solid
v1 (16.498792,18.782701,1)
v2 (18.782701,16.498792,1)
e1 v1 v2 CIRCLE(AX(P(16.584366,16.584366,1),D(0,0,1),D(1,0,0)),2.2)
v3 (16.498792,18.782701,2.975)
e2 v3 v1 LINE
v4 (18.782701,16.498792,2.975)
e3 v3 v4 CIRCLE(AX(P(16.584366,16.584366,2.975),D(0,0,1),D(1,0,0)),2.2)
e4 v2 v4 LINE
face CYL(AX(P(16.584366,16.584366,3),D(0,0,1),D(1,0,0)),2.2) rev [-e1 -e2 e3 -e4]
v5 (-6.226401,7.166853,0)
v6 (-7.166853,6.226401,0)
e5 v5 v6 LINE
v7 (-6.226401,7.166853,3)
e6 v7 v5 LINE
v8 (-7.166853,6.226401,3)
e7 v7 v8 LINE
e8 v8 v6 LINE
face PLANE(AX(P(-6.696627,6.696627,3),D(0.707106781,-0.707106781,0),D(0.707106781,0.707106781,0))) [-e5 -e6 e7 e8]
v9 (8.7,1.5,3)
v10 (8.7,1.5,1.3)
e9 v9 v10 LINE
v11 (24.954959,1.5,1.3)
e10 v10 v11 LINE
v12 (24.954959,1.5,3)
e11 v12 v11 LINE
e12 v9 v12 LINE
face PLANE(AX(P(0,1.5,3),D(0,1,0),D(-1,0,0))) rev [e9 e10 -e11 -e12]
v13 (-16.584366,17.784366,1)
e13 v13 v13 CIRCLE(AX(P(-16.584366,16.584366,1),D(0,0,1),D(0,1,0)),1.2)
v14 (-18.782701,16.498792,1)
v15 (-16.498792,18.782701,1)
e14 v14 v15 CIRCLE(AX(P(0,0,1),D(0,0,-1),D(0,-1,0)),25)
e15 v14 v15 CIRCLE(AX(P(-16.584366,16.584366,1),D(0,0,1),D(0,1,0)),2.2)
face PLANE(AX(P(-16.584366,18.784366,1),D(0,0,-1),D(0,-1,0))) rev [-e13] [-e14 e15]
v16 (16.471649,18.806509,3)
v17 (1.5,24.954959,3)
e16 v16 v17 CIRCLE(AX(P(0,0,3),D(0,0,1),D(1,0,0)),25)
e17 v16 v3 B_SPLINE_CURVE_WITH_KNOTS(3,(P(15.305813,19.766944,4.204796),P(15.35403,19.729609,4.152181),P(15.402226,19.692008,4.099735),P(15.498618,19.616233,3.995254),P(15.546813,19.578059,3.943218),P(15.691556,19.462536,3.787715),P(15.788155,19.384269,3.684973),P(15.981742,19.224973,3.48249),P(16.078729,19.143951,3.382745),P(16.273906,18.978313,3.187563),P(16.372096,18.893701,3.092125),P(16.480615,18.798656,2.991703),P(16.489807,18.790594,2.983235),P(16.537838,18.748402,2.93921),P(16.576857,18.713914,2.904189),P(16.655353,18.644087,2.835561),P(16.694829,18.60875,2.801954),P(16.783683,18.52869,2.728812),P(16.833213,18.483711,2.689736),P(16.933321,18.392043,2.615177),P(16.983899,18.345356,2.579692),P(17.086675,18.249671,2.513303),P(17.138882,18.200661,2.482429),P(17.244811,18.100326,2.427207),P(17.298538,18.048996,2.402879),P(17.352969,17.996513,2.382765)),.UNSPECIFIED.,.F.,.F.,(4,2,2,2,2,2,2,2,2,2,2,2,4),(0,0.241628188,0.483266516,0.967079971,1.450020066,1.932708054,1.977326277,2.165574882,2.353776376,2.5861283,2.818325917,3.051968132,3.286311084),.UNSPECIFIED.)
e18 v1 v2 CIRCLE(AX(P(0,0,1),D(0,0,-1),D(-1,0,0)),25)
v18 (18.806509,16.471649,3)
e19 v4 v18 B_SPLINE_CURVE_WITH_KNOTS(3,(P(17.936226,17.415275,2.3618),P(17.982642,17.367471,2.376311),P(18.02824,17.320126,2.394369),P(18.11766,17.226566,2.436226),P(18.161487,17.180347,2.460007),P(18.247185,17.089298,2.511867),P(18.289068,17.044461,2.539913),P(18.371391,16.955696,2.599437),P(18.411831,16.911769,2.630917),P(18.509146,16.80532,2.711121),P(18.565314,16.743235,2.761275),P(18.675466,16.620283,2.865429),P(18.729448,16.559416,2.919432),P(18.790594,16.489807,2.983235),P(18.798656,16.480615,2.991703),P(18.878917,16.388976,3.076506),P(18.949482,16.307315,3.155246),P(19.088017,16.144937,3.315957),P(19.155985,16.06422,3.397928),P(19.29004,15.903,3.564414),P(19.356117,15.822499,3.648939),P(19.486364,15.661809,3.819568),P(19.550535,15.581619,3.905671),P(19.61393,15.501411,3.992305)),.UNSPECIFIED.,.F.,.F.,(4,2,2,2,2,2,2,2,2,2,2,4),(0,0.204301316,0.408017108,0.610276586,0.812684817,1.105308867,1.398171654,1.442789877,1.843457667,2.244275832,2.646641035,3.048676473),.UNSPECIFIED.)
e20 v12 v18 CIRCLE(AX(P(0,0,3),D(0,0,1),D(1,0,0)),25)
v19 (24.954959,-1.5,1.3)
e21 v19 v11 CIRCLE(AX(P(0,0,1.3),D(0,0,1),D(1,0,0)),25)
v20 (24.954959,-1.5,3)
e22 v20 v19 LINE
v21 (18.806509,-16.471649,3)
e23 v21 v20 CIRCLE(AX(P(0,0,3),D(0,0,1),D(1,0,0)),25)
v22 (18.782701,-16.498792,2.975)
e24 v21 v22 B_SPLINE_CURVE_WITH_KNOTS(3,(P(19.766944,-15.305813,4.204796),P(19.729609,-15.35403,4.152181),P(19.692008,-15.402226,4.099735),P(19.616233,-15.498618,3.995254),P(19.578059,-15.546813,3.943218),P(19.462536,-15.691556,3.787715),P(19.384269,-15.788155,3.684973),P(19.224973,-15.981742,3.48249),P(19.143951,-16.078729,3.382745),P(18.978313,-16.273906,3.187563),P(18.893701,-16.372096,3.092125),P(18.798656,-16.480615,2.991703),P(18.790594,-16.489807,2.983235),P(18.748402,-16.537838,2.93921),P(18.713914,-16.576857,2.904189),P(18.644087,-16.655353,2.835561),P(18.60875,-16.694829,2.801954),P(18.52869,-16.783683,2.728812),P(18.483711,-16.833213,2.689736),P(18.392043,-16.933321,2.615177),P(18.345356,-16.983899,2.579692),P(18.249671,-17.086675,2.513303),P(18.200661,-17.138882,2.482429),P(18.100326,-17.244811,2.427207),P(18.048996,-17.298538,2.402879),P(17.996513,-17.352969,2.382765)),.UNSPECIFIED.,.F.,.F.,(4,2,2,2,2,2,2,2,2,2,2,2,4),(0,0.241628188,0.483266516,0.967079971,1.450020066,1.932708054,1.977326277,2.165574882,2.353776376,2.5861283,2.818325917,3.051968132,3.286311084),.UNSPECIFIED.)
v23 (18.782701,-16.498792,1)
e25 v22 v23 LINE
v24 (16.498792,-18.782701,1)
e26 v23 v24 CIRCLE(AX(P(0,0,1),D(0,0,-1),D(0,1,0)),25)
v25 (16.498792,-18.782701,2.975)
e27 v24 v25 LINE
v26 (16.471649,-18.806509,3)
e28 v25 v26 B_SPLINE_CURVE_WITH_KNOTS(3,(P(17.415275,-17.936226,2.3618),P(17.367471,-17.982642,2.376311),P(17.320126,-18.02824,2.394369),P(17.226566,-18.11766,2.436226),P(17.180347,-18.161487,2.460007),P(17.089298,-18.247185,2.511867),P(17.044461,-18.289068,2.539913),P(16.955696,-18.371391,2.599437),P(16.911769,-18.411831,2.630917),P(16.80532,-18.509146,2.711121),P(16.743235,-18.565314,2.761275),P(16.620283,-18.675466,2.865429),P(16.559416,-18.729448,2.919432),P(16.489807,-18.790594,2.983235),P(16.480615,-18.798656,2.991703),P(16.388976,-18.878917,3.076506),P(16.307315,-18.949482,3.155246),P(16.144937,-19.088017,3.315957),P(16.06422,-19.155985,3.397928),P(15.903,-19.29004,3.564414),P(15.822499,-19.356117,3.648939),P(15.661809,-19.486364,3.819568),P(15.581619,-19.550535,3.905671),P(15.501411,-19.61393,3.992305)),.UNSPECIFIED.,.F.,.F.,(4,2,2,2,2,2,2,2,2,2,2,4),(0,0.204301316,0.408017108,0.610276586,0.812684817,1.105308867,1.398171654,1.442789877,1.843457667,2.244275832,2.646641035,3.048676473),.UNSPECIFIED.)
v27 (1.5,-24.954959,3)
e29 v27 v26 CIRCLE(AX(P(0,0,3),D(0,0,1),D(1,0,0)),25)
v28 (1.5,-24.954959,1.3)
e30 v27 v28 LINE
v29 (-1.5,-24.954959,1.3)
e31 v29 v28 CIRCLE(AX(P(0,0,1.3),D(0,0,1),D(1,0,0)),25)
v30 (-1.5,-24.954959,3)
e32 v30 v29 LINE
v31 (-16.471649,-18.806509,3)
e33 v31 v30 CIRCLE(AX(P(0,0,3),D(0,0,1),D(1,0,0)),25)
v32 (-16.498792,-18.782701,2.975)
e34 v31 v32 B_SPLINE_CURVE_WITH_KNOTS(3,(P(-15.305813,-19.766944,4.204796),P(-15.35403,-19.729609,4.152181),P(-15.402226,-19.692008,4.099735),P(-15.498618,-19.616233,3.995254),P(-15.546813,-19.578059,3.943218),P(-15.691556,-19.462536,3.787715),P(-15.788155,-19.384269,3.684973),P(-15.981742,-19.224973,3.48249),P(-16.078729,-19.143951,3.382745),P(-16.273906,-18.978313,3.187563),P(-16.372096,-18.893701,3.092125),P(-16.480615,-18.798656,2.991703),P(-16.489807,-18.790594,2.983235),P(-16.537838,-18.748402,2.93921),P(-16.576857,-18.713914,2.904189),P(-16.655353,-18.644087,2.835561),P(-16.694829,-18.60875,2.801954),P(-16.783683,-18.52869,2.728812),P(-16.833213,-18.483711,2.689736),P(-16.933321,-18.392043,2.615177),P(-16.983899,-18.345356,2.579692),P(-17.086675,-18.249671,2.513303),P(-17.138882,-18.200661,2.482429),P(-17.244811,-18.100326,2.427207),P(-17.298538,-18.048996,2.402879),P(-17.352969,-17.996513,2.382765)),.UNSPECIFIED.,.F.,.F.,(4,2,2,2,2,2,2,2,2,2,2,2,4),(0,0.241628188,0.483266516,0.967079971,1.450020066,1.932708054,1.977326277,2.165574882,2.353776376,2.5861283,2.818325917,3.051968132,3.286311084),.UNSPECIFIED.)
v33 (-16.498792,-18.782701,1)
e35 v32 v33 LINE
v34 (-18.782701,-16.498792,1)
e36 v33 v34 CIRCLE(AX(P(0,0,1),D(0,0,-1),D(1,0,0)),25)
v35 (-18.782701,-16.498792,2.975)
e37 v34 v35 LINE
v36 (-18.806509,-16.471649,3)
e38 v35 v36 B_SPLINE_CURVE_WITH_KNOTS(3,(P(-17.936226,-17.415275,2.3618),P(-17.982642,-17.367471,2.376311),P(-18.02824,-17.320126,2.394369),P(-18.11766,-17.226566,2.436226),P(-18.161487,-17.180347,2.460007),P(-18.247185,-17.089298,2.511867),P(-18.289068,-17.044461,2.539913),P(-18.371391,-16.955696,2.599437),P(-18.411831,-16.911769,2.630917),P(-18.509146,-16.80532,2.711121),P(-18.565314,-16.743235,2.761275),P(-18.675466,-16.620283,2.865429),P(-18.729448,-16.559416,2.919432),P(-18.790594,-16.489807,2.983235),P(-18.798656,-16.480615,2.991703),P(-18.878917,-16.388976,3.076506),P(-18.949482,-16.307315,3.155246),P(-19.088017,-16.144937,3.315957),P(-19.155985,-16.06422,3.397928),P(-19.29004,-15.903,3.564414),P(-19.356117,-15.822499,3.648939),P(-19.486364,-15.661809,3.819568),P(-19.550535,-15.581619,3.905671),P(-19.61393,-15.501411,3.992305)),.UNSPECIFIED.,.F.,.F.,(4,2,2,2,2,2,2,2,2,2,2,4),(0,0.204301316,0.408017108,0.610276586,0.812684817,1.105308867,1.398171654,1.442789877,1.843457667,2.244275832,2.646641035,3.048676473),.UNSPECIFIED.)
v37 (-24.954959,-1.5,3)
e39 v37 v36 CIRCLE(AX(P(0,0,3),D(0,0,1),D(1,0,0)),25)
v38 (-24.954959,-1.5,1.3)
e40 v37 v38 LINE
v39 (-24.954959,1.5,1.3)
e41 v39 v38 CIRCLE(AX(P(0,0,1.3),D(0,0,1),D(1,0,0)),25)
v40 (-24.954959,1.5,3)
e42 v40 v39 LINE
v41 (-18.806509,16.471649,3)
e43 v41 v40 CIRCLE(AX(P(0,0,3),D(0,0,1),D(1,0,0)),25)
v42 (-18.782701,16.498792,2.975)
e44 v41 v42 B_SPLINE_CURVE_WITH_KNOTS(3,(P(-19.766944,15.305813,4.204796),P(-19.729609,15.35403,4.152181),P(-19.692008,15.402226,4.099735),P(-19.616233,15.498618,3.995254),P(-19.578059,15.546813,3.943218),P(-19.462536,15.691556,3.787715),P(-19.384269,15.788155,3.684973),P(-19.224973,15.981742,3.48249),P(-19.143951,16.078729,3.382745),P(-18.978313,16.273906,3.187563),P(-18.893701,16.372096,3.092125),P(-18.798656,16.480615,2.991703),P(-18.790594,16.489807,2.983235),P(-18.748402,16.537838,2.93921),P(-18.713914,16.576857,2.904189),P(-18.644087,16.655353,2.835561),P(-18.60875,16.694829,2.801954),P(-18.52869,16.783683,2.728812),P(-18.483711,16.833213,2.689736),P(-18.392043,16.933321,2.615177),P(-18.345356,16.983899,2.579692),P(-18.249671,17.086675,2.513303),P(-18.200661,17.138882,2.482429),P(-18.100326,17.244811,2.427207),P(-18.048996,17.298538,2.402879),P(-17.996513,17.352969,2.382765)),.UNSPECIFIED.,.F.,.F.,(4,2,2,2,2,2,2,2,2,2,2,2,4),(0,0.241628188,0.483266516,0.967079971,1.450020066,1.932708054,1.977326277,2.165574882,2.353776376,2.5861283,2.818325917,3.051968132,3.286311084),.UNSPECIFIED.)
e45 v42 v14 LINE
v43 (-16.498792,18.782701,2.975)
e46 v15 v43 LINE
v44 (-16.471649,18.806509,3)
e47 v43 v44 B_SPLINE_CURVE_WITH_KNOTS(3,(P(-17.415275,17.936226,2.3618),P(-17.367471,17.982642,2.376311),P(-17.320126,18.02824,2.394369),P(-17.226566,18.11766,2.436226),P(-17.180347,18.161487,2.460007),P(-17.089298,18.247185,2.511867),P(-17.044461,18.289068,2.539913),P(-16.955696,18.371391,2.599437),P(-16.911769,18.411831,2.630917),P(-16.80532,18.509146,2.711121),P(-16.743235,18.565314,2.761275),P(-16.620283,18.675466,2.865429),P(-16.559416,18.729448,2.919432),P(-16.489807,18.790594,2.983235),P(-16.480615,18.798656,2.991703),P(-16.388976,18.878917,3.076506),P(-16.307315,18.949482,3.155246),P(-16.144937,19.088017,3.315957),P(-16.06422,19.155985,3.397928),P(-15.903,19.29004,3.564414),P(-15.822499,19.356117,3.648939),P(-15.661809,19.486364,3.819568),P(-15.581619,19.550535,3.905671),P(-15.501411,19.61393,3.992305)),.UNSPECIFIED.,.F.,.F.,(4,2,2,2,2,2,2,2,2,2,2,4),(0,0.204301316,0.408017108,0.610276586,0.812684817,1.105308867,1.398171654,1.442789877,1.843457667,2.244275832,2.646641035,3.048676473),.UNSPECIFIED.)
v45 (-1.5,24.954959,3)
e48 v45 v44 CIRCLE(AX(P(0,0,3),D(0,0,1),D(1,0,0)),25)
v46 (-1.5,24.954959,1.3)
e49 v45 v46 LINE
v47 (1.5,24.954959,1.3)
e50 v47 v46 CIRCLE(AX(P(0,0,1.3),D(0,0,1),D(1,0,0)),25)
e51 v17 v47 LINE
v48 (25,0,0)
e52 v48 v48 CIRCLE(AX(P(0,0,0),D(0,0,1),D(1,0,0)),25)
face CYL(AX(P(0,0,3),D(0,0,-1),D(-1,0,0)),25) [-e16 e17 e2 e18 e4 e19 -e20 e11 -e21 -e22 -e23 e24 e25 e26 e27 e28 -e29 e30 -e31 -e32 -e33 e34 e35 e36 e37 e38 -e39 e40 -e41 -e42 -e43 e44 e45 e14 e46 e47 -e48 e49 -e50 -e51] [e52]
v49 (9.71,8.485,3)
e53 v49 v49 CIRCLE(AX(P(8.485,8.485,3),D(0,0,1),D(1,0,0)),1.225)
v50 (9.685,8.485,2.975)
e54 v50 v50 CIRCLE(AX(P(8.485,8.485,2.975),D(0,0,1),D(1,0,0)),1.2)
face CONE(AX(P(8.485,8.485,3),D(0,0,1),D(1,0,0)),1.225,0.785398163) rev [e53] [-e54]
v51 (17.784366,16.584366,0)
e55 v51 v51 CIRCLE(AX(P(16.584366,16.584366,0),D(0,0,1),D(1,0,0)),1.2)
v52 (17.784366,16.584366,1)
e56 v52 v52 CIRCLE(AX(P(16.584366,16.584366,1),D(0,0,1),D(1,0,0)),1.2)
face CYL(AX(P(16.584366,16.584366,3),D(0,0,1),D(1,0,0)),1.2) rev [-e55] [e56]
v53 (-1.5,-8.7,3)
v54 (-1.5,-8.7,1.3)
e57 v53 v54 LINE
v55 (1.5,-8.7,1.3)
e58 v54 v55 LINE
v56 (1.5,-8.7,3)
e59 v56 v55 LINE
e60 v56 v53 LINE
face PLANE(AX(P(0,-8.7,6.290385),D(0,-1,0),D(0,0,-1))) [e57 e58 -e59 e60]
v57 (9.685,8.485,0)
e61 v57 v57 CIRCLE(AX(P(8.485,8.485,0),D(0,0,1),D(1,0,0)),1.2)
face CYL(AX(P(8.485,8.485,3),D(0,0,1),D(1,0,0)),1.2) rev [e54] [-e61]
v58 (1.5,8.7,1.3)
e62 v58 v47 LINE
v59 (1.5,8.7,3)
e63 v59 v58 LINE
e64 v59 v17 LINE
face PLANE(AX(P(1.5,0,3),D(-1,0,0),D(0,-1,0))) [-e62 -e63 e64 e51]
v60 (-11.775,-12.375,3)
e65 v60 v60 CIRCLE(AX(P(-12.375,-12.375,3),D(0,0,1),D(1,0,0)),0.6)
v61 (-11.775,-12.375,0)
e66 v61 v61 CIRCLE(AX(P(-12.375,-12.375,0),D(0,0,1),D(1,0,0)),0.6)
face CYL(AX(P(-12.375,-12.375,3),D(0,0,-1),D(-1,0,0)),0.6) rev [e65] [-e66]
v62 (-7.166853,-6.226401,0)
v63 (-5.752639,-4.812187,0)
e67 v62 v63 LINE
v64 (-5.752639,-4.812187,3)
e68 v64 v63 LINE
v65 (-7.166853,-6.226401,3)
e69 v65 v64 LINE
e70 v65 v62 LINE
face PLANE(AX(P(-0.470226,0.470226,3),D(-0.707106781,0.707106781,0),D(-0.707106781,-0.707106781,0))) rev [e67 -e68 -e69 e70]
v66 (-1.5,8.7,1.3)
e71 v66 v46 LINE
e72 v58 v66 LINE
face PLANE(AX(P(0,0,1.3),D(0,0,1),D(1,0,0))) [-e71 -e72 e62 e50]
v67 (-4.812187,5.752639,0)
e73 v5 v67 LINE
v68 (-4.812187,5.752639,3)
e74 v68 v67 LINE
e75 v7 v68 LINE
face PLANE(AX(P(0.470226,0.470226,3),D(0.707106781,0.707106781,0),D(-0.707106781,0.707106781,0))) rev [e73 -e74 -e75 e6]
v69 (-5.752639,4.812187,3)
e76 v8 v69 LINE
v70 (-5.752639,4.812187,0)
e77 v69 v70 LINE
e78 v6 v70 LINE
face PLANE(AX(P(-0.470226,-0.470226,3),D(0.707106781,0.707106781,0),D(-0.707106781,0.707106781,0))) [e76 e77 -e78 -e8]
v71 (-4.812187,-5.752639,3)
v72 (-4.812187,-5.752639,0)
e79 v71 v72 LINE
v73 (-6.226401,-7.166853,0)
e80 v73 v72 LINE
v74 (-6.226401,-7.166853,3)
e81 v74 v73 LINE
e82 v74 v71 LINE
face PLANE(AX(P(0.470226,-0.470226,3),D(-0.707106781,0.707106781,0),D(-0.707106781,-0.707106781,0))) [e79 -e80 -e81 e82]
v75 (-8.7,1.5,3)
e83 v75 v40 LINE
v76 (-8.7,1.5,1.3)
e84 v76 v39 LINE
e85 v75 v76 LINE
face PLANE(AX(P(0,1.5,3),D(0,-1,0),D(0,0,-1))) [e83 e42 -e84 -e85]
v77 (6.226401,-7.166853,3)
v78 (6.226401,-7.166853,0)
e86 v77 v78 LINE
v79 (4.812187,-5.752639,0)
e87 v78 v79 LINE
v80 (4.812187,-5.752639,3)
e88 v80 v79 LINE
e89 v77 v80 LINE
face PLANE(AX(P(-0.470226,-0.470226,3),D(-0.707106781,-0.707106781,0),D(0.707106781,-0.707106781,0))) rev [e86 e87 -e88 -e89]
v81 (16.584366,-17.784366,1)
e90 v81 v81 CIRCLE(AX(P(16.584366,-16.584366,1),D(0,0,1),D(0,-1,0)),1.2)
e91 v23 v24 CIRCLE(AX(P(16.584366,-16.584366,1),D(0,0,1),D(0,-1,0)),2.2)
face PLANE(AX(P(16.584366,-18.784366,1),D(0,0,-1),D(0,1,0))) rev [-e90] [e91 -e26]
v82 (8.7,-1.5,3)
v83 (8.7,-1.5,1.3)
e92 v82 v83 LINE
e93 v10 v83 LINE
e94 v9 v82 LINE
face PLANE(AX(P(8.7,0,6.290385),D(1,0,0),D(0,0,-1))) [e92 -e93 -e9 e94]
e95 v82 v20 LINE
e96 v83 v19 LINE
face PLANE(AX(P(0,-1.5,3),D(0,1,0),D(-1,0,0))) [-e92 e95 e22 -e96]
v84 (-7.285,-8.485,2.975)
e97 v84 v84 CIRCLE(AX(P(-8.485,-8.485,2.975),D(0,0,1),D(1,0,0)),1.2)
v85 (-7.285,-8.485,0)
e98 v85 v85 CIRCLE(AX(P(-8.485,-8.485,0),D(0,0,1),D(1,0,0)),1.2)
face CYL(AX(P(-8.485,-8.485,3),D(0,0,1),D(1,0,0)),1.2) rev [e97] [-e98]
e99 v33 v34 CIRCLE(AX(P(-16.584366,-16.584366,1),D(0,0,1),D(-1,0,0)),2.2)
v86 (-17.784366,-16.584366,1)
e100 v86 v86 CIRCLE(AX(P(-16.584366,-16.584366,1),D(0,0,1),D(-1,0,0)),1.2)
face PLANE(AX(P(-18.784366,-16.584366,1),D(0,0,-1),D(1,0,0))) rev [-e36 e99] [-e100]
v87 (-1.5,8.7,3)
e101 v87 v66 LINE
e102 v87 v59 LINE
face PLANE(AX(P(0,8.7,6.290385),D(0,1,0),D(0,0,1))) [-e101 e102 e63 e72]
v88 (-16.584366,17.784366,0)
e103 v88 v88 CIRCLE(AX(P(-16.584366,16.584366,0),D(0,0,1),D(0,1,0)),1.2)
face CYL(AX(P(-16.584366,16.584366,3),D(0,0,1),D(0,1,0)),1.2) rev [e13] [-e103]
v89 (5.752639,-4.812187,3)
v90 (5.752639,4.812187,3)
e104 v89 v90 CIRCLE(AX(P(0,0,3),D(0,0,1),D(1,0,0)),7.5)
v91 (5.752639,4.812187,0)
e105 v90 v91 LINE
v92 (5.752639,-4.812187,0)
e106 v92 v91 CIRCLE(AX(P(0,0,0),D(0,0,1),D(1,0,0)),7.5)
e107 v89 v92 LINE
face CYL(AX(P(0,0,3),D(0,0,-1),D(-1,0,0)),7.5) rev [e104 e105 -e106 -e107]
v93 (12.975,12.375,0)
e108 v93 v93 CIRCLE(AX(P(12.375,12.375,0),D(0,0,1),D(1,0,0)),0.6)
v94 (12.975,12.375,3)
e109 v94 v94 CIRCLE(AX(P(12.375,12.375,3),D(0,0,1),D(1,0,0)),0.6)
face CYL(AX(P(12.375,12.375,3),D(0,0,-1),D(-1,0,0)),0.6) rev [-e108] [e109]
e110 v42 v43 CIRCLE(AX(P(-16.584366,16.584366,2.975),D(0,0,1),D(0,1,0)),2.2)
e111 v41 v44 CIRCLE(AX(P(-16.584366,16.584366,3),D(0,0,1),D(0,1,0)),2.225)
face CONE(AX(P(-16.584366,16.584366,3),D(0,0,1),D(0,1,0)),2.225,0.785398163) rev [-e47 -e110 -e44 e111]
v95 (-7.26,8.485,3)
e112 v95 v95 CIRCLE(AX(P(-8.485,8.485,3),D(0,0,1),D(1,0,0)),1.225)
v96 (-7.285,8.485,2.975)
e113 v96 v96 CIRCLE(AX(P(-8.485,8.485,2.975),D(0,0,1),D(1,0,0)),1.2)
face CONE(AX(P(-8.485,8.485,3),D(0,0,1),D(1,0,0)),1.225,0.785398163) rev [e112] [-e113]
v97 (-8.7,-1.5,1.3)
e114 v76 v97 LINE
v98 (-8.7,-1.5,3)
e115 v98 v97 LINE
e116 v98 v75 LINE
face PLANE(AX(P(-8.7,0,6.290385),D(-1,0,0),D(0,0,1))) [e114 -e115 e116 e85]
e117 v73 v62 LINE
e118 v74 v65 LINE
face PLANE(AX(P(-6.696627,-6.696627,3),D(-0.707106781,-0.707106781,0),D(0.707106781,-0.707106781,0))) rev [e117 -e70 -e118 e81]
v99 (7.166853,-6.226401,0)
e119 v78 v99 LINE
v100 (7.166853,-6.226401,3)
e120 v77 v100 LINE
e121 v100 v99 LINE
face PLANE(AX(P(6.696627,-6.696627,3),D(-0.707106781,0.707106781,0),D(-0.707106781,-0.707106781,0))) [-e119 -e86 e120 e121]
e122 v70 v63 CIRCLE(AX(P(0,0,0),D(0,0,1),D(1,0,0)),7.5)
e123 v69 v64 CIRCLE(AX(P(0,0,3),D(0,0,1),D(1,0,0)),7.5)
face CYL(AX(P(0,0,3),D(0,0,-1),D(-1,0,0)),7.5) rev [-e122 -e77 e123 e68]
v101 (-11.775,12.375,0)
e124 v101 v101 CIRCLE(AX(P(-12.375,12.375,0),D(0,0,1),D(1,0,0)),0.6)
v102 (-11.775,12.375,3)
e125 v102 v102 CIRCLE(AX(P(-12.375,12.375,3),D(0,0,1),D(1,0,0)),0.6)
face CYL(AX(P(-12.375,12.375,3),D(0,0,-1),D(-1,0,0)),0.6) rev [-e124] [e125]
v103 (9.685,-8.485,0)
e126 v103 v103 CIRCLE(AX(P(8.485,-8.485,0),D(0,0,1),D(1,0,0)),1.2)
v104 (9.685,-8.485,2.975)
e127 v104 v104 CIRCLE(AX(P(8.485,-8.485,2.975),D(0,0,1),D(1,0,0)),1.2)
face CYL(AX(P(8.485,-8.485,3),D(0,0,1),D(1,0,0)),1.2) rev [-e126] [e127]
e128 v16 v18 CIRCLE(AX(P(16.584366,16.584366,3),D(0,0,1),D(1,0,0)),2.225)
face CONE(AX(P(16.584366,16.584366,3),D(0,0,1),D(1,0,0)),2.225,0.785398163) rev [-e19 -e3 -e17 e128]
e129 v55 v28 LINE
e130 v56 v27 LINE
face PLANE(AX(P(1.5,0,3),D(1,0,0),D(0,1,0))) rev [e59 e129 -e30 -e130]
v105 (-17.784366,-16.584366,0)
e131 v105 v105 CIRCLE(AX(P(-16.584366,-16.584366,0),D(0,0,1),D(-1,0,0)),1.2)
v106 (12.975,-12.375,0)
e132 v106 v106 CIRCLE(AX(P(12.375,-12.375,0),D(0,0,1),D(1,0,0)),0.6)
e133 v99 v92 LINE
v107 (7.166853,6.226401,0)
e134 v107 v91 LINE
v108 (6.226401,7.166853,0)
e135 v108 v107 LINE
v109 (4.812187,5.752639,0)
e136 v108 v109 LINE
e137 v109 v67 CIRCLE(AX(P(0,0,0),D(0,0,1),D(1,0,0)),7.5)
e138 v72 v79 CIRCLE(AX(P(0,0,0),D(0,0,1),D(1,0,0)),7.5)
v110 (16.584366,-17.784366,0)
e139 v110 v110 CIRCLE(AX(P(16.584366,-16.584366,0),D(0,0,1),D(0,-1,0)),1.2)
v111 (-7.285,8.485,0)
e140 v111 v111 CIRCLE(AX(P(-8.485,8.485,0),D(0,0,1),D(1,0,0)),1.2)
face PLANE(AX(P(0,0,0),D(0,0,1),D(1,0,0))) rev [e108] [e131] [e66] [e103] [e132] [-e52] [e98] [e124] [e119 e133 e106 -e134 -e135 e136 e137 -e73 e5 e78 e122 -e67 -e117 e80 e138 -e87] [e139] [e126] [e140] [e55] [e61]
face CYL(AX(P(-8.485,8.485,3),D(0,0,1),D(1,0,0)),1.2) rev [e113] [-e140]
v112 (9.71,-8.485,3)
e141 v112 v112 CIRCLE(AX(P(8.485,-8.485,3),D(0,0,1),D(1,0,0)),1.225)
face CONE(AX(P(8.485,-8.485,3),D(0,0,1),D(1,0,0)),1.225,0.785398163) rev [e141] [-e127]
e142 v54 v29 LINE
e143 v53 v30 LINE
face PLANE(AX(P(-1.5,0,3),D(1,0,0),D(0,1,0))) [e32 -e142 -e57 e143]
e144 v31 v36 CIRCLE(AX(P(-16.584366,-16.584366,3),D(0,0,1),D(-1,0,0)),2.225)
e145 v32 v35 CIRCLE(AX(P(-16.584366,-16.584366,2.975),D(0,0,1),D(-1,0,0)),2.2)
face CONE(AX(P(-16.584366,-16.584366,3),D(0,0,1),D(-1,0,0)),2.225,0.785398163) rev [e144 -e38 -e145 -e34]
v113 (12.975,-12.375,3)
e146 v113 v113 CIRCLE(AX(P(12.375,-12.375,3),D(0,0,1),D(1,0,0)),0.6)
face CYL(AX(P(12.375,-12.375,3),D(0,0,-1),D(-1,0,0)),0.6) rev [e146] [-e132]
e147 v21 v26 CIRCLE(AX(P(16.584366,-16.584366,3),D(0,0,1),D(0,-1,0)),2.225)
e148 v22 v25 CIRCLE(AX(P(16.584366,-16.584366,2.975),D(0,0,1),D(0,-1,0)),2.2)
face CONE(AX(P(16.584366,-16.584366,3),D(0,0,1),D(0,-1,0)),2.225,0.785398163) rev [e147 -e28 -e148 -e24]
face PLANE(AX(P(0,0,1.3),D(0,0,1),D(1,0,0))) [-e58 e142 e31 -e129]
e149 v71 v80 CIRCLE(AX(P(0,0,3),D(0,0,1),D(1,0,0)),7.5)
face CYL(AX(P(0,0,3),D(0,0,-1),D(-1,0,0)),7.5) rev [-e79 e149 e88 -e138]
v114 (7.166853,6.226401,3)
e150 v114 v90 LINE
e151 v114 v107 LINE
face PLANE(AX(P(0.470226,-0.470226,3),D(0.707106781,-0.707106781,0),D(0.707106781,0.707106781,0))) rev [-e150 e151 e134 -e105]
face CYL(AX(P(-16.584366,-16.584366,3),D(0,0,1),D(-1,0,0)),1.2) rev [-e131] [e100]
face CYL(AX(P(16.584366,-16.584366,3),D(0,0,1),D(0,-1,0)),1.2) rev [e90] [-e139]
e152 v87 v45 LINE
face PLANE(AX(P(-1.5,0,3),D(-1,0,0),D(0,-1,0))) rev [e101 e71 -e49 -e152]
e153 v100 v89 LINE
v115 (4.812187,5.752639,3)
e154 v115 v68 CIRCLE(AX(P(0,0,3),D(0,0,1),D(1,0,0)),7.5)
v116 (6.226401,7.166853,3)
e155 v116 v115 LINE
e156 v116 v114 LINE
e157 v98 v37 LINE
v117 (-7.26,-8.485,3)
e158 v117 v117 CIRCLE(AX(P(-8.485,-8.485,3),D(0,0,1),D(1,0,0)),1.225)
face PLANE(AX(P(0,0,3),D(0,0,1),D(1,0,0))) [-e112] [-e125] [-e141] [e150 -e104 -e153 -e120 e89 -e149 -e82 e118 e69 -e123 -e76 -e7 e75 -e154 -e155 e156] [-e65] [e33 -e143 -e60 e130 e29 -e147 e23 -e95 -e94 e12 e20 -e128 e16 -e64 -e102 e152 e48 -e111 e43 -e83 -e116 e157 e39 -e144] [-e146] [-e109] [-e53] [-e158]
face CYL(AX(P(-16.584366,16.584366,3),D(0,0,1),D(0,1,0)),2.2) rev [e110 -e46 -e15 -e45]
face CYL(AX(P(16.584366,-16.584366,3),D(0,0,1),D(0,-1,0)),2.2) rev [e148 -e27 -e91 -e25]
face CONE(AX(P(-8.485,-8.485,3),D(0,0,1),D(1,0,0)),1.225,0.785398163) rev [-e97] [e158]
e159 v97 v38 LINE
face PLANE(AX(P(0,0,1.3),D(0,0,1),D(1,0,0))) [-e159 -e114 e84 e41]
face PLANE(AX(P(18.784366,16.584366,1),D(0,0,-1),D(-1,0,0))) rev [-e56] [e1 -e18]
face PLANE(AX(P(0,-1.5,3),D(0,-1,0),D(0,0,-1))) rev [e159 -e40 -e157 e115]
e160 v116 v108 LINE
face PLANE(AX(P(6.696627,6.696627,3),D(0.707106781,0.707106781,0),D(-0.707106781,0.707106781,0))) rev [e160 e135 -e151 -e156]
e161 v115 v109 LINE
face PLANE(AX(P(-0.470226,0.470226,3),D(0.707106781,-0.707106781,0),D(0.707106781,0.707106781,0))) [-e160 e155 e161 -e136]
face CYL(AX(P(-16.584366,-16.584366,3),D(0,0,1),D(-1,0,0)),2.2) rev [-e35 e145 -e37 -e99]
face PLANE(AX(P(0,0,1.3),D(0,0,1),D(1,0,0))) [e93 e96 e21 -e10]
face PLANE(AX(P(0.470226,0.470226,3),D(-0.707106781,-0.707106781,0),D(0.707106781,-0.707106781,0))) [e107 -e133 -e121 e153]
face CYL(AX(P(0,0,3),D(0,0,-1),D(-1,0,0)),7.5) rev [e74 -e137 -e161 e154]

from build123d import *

# Parameters (mm, degrees)
SKETCH1_R             = 0.6
BOSS_EXTRUDE1_DEPTH   = 3
BOSS_EXTRUDE1_2_DEPTH = 3
BOSS_EXTRUDE1_3_DEPTH = 3
BOSS_EXTRUDE1_4_DEPTH = 3
BOSS_EXTRUDE2_DEPTH   = 1.3
BOSS_EXTRUDE3_DEPTH   = 3
CIRPATTERN1_COUNT     = 4


# Read off the part's stored shape, not the designer's step: M2 Clearance Hole1
with BuildPart() as part:
    # Sketch1 → Boss-Extrude1 (new body)
    with BuildSketch(Plane(origin=(0, 0, 0), x_dir=(0, 1, 0), z_dir=(0, 0, 1))):
        with BuildLine():
            Line((-1.5, 7.348469228), (-1.5, 24.954959427))
            ThreePointArc((-1.5, 24.954959427), (-17.67766953, 17.67766953), (-24.954959427, 1.5))
            Line((-24.954959427, 1.5), (-7.348469228, 1.5))
            ThreePointArc((-7.348469228, 1.5), (-6.756656365, 3.255394717), (-5.752639047, 4.812187028))
            Line((-5.752639047, 4.812187028), (-7.166852609, 6.226400591))
            Line((-7.166852609, 6.226400591), (-6.226400591, 7.166852609))
            Line((-6.226400591, 7.166852609), (-4.812187028, 5.752639047))
            ThreePointArc((-4.812187028, 5.752639047), (-3.255394717, 6.756656365), (-1.5, 7.348469228))
        make_face()
        with Locations(Location((-12.375, 12.375, 0), (0, 0, 270))):
            Circle(SKETCH1_R, mode=Mode.SUBTRACT)
    extrude(amount=BOSS_EXTRUDE1_DEPTH)

    # Sketch1<9> → Boss-Extrude2 (add)
    with BuildSketch(Plane(origin=(0, 0, 0), x_dir=(0, 1, 0), z_dir=(0, 0, 1))):
        with BuildLine():
            Line((1.5, 7.348469228), (1.5, 24.954959427))
            ThreePointArc((1.5, 24.954959427), (0, 25), (-1.5, 24.954959427))
            Line((-1.5, 24.954959427), (-1.5, 7.348469228))
            ThreePointArc((-1.5, 7.348469228), (0, 7.5), (1.5, 7.348469228))
        make_face()
        with BuildLine():
            ThreePointArc((-24.954959427, 1.5), (-25, 0), (-24.954959427, -1.5))
            Line((-24.954959427, -1.5), (-7.348469228, -1.5))
            ThreePointArc((-7.348469228, -1.5), (-7.5, 0), (-7.348469228, 1.5))
            Line((-7.348469228, 1.5), (-24.954959427, 1.5))
        make_face()
        with BuildLine():
            ThreePointArc((24.954959427, -1.5), (25, 0), (24.954959427, 1.5))
            Line((24.954959427, 1.5), (7.348469228, 1.5))
            ThreePointArc((7.348469228, 1.5), (7.5, 0), (7.348469228, -1.5))
            Line((7.348469228, -1.5), (24.954959427, -1.5))
        make_face()
        with BuildLine():
            ThreePointArc((-1.5, -24.954959427), (0, -25), (1.5, -24.954959427))
            Line((1.5, -24.954959427), (1.5, -7.348469228))
            ThreePointArc((1.5, -7.348469228), (0, -7.5), (-1.5, -7.348469228))
            Line((-1.5, -7.348469228), (-1.5, -24.954959427))
        make_face()
    extrude(amount=BOSS_EXTRUDE2_DEPTH)


with BuildPart() as body_2:
    # Sketch1 → Boss-Extrude1 2 (new body)
    with BuildSketch(Plane(origin=(0, 0, 0), x_dir=(0, 1, 0), z_dir=(0, 0, 1))):
        with BuildLine():
            Line((1.5, 24.954959427), (1.5, 7.348469228))
            ThreePointArc((1.5, 7.348469228), (3.255394717, 6.756656365), (4.812187028, 5.752639047))
            Line((4.812187028, 5.752639047), (6.226400591, 7.166852609))
            Line((6.226400591, 7.166852609), (7.166852609, 6.226400591))
            Line((7.166852609, 6.226400591), (5.752639047, 4.812187028))
            ThreePointArc((5.752639047, 4.812187028), (6.756656365, 3.255394717), (7.348469228, 1.5))
            Line((7.348469228, 1.5), (24.954959427, 1.5))
            ThreePointArc((24.954959427, 1.5), (17.67766953, 17.67766953), (1.5, 24.954959427))
        make_face()
        with Locations(Location((12.375, 12.375, 0), (0, 0, 270))):
            Circle(SKETCH1_R, mode=Mode.SUBTRACT)
    extrude(amount=BOSS_EXTRUDE1_2_DEPTH)

    # M2 Clearance Hole1 4 outline → M2 Clearance Hole1 4 (revolve, cut)
    with BuildSketch(Plane(origin=(-8.485, 8.485, 0), x_dir=(1, 0, 0), z_dir=(0, -1, 0))):
        Polygon((0, 0), (1.2, 0), (1.2, 2.975), (1.225, 3), (0, 3), align=None)
    revolve(axis=Axis((-8.485, 8.485, 0), (0, 0, 1)), mode=Mode.SUBTRACT)



with BuildPart() as body_3:
    # Sketch1 → Boss-Extrude1 3 (new body)
    with BuildSketch(Plane(origin=(0, 0, 0), x_dir=(0, 1, 0), z_dir=(0, 0, 1))):
        with BuildLine():
            Line((-7.348469228, -1.5), (-24.954959427, -1.5))
            ThreePointArc((-24.954959427, -1.5), (-17.67766953, -17.67766953), (-1.5, -24.954959427))
            Line((-1.5, -24.954959427), (-1.5, -7.348469228))
            ThreePointArc((-1.5, -7.348469228), (-3.255394717, -6.756656365), (-4.812187028, -5.752639047))
            Line((-4.812187028, -5.752639047), (-6.226400591, -7.166852609))
            Line((-6.226400591, -7.166852609), (-7.166852609, -6.226400591))
            Line((-7.166852609, -6.226400591), (-5.752639047, -4.812187028))
            ThreePointArc((-5.752639047, -4.812187028), (-6.756656365, -3.255394717), (-7.348469228, -1.5))
        make_face()
        with Locations(Location((-12.375, -12.375, 0), (0, 0, 270))):
            Circle(SKETCH1_R, mode=Mode.SUBTRACT)
    extrude(amount=BOSS_EXTRUDE1_3_DEPTH)

    # M2 Clearance Hole1 2 outline → M2 Clearance Hole1 2 (revolve, cut)
    with BuildSketch(Plane(origin=(8.485, -8.485, 0), x_dir=(1, 0, 0), z_dir=(0, -1, 0))):
        Polygon((0, 0), (1.2, 0), (1.2, 2.975), (1.225, 3), (0, 3), align=None)
    revolve(axis=Axis((8.485, -8.485, 0), (0, 0, 1)), mode=Mode.SUBTRACT)


with BuildPart() as body_4:
    # Sketch1 → Boss-Extrude1 4 (new body)
    with BuildSketch(Plane(origin=(0, 0, 0), x_dir=(0, 1, 0), z_dir=(0, 0, 1))):
        with BuildLine():
            Line((24.954959427, -1.5), (7.348469228, -1.5))
            ThreePointArc((7.348469228, -1.5), (6.756656365, -3.255394717), (5.752639047, -4.812187028))
            Line((5.752639047, -4.812187028), (7.166852609, -6.226400591))
            Line((7.166852609, -6.226400591), (6.226400591, -7.166852609))
            Line((6.226400591, -7.166852609), (4.812187028, -5.752639047))
            ThreePointArc((4.812187028, -5.752639047), (3.255394717, -6.756656365), (1.5, -7.348469228))
            Line((1.5, -7.348469228), (1.5, -24.954959427))
            ThreePointArc((1.5, -24.954959427), (17.67766953, -17.67766953), (24.954959427, -1.5))
        make_face()
        with Locations(Location((12.375, -12.375, 0), (0, 0, 270))):
            Circle(SKETCH1_R, mode=Mode.SUBTRACT)
    extrude(amount=BOSS_EXTRUDE1_4_DEPTH)

    # M2 Clearance Hole1 outline → M2 Clearance Hole1 (revolve, cut)
    with BuildSketch(Plane(origin=(8.485, 8.485, 0), x_dir=(1, 0, 0), z_dir=(0, -1, 0))):
        Polygon((0, 0), (1.2, 0), (1.2, 2.975), (1.225, 3), (0, 3), align=None)
    revolve(axis=Axis((8.485, 8.485, 0), (0, 0, 1)), mode=Mode.SUBTRACT)


with BuildPart() as boss_extrude2_piece_1:
    # of the separate pieces the step leaves, piece 1, a body of its own (boss_extrude2_pieces)
    add(part.part.solids().sort_by_distance((-24.954959427, -1.5, 1.3))[0])

    # M2 Clearance Hole1 3 outline → M2 Clearance Hole1 3 (revolve, cut)
    with BuildSketch(Plane(origin=(-8.485, -8.485, 0), x_dir=(1, 0, 0), z_dir=(0, -1, 0))):
        Polygon((0, 0), (1.2, 0), (1.2, 2.975), (1.225, 3), (0, 3), align=None)
    revolve(axis=Axis((-8.485, -8.485, 0), (0, 0, 1)), mode=Mode.SUBTRACT)


with BuildPart() as boss_extrude2_piece_2:
    # of the separate pieces the step leaves, piece 2, a body of its own (boss_extrude2_pieces)
    add(part.part.solids().sort_by_distance((-1.5, 7.348469228, 0))[0])


with BuildPart() as boss_extrude2_piece_3:
    # of the separate pieces the step leaves, piece 3, a body of its own (boss_extrude2_pieces)
    add(part.part.solids().sort_by_distance((24.954959427, -1.5, 0))[0])


with BuildPart() as body_2_1:
    add(body_2.part)

    add(body_3.part)  # Boss-Extrude3 merges body 3

    add(body_4.part)  # Boss-Extrude3 merges body 4

    add(boss_extrude2_piece_1.part)  # Boss-Extrude3 merges Boss-Extrude2 piece 1

    add(boss_extrude2_piece_2.part)  # Boss-Extrude3 merges Boss-Extrude2 piece 2

    add(boss_extrude2_piece_3.part)  # Boss-Extrude3 merges Boss-Extrude2 piece 3
    # Sketch1<10> → Boss-Extrude3 (add)
    with BuildSketch(Plane(origin=(0, 0, 0), x_dir=(0, 1, 0), z_dir=(0, 0, 1))):
        with BuildLine():
            Line((-1.5, -7.348469228), (-1.5, -8.7))
            Line((-1.5, -8.7), (1.5, -8.7))
            Line((1.5, -8.7), (1.5, -7.348469228))
            ThreePointArc((1.5, -7.348469228), (0, -7.5), (-1.5, -7.348469228))
        make_face()
        with BuildLine():
            Line((-7.348469228, 1.5), (-8.7, 1.5))
            Line((-8.7, 1.5), (-8.7, -1.5))
            Line((-8.7, -1.5), (-7.348469228, -1.5))
            ThreePointArc((-7.348469228, -1.5), (-7.5, 0), (-7.348469228, 1.5))
        make_face()
        with BuildLine():
            Line((1.5, 8.7), (-1.5, 8.7))
            Line((-1.5, 8.7), (-1.5, 7.348469228))
            ThreePointArc((-1.5, 7.348469228), (0, 7.5), (1.5, 7.348469228))
            Line((1.5, 7.348469228), (1.5, 8.7))
        make_face()
        with BuildLine():
            Line((8.7, -1.5), (8.7, 1.5))
            Line((8.7, 1.5), (7.348469228, 1.5))
            ThreePointArc((7.348469228, 1.5), (7.5, 0), (7.348469228, -1.5))
            Line((7.348469228, -1.5), (8.7, -1.5))
        make_face()
    extrude(amount=BOSS_EXTRUDE3_DEPTH)

    # Sketch8 → CBORE for M2 SHCS1 (revolve, cut)
    with BuildSketch(Plane(origin=(16.584366049, 16.584366049, 3), x_dir=(0, -1, 0), z_dir=(1, 0, 0))):
        Polygon((0, 0), (0, 3), (1.2, 3), (1.2, 2), (2.2, 2), (2.2, 0.025), (2.225, 0), align=None)
    cbore_for_m2_shcs1 = revolve(axis=Axis((16.584366049, 16.584366049, 9.35), (0, 0, -1)), mode=Mode.SUBTRACT)

    # CirPattern1: CBORE for M2 SHCS1 ×4 about axis
    cirpattern1_axis = Axis((0, 0, 0), (0, 0, 1))
    for i in range(1, CIRPATTERN1_COUNT):
        add(cbore_for_m2_shcs1.rotate(cirpattern1_axis, i * 360 / CIRPATTERN1_COUNT), mode=Mode.SUBTRACT)


solid = body_2_1.part
